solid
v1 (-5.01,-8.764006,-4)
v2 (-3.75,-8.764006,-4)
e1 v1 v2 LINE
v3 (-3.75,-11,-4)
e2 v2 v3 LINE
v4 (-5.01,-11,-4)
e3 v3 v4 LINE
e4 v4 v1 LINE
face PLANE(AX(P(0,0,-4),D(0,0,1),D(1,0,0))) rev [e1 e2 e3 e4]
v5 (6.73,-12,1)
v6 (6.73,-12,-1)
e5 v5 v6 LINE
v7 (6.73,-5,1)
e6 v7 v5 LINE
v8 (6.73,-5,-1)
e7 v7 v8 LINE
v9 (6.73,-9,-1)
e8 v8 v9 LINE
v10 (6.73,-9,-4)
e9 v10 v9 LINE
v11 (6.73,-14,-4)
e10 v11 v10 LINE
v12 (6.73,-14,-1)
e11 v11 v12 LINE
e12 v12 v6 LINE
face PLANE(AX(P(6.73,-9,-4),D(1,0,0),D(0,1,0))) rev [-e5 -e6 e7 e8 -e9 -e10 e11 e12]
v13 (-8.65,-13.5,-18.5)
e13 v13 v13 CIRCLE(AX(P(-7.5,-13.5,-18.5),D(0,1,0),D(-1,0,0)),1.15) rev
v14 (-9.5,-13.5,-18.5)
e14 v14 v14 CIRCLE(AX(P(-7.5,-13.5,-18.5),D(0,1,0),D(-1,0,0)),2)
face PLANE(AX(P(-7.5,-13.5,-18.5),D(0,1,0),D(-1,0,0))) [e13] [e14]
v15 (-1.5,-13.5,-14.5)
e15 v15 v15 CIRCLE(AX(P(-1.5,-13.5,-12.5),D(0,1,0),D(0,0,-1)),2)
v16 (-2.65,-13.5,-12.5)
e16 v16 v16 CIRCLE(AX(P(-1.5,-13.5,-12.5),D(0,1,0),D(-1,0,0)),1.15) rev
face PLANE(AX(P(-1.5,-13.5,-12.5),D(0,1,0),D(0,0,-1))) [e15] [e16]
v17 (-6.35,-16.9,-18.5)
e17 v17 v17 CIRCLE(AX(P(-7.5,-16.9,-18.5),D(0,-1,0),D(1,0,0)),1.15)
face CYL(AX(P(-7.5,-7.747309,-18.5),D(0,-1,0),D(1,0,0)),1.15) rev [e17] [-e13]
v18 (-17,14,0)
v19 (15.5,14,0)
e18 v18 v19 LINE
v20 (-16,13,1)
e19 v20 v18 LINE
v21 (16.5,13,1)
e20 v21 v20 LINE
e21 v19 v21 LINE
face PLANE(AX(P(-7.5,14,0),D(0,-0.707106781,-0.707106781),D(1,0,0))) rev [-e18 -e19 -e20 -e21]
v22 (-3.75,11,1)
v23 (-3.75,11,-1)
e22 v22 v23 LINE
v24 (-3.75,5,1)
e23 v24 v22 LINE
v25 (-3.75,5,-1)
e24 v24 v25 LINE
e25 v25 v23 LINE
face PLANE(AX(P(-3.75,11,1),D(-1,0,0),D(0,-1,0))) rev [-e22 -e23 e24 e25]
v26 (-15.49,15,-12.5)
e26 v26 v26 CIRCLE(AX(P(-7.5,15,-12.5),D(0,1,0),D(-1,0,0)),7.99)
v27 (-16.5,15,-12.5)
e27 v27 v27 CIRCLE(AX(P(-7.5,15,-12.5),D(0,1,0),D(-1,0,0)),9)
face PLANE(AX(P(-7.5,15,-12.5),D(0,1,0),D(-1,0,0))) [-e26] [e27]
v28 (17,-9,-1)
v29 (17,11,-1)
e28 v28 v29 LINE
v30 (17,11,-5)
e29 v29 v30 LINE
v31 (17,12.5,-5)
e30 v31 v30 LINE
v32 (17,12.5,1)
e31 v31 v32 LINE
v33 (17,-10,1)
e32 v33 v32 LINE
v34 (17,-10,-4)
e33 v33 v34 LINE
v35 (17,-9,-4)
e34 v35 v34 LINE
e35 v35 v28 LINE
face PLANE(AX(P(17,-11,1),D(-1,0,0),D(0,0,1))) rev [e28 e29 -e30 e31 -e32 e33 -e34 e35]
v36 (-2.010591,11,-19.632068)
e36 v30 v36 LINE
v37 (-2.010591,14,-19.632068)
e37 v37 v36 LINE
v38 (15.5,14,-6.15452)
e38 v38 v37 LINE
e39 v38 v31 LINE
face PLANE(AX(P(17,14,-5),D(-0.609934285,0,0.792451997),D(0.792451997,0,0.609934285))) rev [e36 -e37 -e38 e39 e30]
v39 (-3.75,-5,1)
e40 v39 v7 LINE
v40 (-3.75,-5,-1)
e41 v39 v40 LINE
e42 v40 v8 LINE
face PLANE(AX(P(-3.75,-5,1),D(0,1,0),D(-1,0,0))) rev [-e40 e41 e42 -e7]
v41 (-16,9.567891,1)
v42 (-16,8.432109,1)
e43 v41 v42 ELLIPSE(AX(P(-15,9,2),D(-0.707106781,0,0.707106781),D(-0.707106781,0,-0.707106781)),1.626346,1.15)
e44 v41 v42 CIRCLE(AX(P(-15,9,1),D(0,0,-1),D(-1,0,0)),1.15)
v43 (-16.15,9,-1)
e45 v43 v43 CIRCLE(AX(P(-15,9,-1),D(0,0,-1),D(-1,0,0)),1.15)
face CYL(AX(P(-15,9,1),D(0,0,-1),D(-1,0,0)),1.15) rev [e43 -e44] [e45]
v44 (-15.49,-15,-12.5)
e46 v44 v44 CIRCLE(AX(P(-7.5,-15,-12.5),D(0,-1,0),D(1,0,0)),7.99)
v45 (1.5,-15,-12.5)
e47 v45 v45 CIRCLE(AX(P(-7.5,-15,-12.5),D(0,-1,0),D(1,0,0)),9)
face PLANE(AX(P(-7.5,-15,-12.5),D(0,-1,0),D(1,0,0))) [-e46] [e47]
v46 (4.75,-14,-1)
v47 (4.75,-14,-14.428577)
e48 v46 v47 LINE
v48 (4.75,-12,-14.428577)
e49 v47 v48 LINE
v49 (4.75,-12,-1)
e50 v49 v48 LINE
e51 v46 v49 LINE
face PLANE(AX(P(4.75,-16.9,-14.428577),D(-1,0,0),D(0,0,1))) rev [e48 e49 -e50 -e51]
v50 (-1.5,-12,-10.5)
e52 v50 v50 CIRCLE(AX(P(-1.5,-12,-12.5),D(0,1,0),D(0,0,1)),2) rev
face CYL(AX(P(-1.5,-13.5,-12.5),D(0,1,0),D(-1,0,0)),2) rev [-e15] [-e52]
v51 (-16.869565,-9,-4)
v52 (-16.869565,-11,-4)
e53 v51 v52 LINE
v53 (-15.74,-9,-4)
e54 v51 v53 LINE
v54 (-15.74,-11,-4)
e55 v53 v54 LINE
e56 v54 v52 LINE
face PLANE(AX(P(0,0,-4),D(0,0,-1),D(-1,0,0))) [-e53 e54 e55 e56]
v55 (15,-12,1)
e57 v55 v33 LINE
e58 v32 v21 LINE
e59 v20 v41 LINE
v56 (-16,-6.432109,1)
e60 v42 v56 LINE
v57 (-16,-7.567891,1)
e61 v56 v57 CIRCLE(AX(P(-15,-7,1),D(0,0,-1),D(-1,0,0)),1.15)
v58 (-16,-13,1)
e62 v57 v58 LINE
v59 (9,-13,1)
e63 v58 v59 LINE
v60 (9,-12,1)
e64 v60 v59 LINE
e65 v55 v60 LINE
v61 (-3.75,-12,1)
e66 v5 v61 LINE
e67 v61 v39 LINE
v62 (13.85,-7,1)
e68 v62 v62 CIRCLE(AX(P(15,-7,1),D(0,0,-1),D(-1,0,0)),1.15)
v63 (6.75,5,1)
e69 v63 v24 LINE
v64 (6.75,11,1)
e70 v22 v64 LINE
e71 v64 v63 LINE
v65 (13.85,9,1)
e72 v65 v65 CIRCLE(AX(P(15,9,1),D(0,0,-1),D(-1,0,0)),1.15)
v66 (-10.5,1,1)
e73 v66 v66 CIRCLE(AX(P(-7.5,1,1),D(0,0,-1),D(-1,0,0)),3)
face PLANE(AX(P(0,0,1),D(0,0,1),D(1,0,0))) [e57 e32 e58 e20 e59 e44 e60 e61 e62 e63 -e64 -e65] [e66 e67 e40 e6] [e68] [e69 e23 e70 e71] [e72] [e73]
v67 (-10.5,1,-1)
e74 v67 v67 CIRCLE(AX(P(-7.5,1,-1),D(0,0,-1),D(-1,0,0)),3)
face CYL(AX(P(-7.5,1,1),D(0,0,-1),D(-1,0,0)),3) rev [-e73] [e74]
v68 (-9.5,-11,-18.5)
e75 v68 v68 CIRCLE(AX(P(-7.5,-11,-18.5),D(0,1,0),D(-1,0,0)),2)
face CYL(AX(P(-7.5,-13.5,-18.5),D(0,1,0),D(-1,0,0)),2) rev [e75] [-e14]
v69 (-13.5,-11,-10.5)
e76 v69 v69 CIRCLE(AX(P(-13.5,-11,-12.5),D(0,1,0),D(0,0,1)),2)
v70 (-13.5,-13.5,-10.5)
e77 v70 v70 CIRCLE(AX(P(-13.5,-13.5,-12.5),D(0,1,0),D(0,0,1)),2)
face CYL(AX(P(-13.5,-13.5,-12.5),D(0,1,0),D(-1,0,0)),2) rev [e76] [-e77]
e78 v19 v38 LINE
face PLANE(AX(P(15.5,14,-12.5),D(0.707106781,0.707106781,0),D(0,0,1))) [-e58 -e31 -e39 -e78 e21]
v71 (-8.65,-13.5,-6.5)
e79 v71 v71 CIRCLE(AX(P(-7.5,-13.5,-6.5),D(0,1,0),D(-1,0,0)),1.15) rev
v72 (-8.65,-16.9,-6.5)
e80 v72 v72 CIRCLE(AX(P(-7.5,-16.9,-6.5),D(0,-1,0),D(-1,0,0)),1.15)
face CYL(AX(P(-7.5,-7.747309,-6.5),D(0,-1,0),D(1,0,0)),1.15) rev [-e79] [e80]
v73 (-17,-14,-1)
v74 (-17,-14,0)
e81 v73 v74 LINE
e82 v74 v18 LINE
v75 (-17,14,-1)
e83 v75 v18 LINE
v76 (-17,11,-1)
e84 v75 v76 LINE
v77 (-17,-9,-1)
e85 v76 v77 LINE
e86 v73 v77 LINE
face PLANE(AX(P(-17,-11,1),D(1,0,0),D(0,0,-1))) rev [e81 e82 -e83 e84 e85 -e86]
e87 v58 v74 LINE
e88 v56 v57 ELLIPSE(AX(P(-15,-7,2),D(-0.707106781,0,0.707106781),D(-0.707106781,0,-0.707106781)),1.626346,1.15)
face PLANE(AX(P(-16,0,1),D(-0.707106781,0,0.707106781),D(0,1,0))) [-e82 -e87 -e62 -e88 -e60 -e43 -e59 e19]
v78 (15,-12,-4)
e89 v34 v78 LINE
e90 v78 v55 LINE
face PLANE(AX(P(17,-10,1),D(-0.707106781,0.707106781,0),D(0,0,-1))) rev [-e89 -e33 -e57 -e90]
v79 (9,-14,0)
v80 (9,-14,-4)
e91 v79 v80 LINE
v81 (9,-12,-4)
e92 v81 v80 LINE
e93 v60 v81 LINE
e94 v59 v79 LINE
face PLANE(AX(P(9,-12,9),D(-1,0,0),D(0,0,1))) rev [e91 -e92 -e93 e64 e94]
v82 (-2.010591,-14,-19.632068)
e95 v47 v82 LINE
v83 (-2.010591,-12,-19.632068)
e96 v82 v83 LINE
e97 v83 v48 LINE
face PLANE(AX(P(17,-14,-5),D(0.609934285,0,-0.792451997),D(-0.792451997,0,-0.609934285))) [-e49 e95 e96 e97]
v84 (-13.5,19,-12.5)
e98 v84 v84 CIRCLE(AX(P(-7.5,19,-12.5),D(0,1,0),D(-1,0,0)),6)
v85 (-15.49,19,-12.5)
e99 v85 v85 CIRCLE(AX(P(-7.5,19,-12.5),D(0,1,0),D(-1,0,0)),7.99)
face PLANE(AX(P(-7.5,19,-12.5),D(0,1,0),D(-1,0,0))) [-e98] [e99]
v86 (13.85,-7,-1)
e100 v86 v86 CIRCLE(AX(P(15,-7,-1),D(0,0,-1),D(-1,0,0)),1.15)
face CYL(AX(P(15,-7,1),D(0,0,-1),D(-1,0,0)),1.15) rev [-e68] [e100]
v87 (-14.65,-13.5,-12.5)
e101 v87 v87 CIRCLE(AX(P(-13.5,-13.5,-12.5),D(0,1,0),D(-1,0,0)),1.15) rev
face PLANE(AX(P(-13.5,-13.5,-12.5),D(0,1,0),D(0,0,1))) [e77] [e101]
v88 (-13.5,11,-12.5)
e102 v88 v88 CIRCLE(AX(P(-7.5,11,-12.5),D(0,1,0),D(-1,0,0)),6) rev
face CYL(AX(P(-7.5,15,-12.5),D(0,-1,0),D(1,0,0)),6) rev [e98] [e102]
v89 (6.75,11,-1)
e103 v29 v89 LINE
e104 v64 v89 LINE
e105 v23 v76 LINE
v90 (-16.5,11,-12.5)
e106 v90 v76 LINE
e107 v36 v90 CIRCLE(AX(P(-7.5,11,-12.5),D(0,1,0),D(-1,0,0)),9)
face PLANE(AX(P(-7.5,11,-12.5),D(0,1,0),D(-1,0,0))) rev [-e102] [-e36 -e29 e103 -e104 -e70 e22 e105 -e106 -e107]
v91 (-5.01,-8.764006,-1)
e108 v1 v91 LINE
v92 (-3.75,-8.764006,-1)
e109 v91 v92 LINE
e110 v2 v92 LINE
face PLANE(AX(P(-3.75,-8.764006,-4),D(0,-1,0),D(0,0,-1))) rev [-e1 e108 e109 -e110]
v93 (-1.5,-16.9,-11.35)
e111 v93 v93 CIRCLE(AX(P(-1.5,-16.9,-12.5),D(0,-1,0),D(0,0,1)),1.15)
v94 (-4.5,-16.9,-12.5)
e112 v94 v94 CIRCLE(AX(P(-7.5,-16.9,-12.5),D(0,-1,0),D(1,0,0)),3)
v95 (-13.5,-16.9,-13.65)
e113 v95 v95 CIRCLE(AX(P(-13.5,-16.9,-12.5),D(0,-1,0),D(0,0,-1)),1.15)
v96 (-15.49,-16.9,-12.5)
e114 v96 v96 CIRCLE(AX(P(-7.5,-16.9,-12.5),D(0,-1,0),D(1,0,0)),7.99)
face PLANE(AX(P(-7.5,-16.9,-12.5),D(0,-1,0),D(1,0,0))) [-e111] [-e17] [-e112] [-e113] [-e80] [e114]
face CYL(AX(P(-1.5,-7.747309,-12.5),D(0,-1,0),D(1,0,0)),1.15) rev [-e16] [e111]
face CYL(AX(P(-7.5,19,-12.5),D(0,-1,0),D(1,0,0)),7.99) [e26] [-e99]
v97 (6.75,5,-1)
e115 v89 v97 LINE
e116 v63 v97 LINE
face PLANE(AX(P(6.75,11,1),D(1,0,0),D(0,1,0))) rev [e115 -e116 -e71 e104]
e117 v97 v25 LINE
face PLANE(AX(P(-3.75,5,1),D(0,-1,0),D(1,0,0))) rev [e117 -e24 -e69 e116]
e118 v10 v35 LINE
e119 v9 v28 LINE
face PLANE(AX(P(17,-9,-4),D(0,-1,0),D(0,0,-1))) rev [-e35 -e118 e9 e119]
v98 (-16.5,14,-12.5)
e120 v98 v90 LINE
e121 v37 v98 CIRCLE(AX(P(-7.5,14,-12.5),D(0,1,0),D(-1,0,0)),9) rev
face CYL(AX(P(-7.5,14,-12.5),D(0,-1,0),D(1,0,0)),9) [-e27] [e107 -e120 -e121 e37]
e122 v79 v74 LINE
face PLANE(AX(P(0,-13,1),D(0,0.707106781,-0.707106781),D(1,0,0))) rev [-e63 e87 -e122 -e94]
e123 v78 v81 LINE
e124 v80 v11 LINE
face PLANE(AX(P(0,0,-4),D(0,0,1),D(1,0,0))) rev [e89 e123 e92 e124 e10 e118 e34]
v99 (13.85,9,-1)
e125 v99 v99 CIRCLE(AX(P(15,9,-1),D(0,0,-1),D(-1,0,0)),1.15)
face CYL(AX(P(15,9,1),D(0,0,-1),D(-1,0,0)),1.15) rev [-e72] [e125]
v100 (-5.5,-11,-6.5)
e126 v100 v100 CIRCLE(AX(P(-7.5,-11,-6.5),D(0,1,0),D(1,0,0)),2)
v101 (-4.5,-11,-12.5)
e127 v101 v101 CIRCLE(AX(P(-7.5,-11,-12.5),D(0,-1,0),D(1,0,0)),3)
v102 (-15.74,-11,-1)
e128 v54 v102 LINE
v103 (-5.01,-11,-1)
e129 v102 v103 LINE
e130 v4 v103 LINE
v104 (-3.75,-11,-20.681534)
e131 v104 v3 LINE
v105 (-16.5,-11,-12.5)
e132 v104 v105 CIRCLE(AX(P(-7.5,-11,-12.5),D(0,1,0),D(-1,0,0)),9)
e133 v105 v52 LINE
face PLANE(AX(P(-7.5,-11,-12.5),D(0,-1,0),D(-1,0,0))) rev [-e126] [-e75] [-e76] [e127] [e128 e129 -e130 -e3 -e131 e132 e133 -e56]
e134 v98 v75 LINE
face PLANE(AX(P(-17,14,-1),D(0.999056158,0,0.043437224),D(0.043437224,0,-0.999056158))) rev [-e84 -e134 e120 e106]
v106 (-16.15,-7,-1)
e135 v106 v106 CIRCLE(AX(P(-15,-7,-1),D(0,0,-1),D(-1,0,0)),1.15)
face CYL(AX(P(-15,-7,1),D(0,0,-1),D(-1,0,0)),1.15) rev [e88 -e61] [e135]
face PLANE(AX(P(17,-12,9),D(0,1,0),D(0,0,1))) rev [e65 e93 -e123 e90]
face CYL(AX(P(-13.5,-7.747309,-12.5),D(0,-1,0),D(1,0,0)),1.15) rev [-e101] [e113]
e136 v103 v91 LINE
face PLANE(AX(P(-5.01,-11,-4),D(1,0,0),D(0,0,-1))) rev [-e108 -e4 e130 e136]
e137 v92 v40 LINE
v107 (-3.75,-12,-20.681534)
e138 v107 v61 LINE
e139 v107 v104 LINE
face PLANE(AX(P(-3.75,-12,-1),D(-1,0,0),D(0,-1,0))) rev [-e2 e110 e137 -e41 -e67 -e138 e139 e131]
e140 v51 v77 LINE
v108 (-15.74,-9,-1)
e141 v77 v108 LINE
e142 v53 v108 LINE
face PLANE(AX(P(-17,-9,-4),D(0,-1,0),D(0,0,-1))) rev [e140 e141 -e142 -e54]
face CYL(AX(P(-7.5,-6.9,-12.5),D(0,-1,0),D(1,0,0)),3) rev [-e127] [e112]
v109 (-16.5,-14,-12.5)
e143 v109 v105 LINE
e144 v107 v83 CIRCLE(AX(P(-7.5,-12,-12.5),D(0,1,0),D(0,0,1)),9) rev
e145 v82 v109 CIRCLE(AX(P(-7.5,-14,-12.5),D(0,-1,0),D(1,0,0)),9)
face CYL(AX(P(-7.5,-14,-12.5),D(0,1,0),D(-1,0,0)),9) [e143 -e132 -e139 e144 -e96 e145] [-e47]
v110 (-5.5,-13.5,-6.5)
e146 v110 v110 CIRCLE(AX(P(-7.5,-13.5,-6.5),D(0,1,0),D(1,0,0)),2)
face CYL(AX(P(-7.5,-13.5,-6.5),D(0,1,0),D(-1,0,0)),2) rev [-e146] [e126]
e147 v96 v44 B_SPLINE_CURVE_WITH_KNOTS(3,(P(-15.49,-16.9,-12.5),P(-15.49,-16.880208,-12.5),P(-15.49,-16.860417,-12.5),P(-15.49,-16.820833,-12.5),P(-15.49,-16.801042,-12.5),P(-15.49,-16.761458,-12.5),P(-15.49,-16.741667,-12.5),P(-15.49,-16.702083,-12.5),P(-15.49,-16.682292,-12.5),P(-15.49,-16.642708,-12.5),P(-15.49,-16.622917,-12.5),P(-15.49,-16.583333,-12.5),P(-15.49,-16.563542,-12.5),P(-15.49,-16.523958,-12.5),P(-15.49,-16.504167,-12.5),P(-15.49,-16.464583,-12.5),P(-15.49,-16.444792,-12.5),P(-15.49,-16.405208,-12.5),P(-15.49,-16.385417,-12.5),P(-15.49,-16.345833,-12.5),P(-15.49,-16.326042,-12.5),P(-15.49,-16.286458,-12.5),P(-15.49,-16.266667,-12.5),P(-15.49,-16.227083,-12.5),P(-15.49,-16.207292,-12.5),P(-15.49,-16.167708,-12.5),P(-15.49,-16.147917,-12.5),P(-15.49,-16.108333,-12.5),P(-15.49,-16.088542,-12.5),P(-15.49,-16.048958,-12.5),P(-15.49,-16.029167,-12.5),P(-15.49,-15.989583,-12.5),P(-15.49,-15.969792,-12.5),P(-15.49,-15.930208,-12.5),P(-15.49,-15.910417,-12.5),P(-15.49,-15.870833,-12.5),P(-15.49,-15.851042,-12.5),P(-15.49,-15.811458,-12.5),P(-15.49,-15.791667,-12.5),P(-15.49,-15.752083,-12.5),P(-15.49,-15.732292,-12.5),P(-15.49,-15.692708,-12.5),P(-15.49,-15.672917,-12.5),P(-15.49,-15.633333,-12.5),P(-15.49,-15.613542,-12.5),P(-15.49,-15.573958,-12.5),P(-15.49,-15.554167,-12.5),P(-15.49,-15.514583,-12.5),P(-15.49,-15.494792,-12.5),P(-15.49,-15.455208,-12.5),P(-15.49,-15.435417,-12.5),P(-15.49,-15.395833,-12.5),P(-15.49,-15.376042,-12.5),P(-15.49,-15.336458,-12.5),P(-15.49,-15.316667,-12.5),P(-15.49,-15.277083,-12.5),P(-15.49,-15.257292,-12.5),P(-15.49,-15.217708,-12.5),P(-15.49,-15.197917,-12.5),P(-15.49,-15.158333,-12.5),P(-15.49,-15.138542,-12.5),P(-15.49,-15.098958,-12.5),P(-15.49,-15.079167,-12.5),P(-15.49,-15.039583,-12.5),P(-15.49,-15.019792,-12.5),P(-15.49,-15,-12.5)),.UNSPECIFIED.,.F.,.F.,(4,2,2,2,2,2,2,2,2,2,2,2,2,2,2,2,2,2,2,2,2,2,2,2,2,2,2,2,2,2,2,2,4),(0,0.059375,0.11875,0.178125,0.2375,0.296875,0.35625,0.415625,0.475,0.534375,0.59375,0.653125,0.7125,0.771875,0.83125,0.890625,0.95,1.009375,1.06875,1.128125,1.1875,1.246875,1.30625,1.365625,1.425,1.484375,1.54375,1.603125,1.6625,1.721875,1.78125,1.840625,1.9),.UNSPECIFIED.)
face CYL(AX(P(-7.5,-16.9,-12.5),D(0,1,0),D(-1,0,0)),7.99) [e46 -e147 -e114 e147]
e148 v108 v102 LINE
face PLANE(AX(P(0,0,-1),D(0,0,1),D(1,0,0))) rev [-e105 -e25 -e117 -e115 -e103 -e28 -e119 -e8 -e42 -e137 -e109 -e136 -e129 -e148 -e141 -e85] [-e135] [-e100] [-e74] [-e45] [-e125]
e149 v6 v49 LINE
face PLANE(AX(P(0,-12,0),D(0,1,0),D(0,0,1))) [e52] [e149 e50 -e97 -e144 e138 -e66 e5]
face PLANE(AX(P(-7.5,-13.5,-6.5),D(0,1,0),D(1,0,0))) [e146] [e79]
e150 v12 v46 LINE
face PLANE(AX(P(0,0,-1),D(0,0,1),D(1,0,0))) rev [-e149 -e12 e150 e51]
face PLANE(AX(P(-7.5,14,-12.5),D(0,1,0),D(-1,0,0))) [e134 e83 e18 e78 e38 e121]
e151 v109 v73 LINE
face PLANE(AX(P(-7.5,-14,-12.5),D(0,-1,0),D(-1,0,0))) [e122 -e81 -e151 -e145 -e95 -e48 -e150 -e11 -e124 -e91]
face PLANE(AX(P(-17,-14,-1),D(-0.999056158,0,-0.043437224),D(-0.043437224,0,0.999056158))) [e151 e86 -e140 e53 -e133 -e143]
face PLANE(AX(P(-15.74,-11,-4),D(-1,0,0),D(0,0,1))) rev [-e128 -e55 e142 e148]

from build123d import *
from build123d.topology import SkipClean

# Parameters (mm, degrees)
SKETCH_1_W               = 34
SKETCH_1_H               = 22
EXTRUDE_1_DEPTH          = 1
SKETCH_3_R               = 9
SKETCH_3_R_2             = 6
EXTRUDE_3_DEPTH          = 4
SKETCH_4_R               = 7.99
SKETCH_4_R_2             = 6
EXTRUDE_4_DEPTH          = 4
EXTRUDE_5_DEPTH          = 3
CUT_EXTRUDE_START        = -3
SKETCH_6_R               = 6
CUT_EXTRUDE_1_DEPTH      = 3
MIRROR_START             = -14
MIRROR_9_OUTLINE_R       = 6
MIRROR_9_DEPTH           = 3
EXTRUDE_START            = 1
SKETCH_7_R               = 9
SKETCH_7_R_2             = 6
EXTRUDE_6_DEPTH          = 1
EXTRUDE_START_2          = 1.9
SKETCH_8_R               = 7.99
EXTRUDE_7_DEPTH          = 1.9
EXTRUDE_START_3          = -5.9
SKETCH_9_R               = 6
EXTRUDE_8_DEPTH          = 5.9
SKETCH_10_R              = 3
CUT_EXTRUDE_2_DEPTH      = 10
CUT_EXTRUDE_3_REACH      = 47.167
SKETCH_11_R              = 1.15
PATTERN_CIRCULAR_1_COUNT = 4
SKETCH_12_R              = 2
CUT_EXTRUDE_4_DEPTH      = 2.5
PATTERN_CIRCULAR_2_COUNT = 4
CUT_EXTRUDE_5_DEPTH      = 41.635575547
CHAMFER_1_SIZE           = 1.5
SKETCH_15_W              = 8
SKETCH_15_H              = 2
CUT_EXTRUDE_8_DEPTH      = 10
EXTRUDE_9_DEPTH          = 3
SKETCH_17_W              = 8.5
SKETCH_17_H              = 21.138622828
CUT_EXTRUDE_9_DEPTH      = 1
SKETCH_18_W              = 10.48
SKETCH_18_H              = 7
SKETCH_18_W_2            = 10.5
SKETCH_18_H_2            = 6
CUT_EXTRUDE_10_DEPTH     = 33.714675606
CHAMFER_2_SIZE           = 2
SKETCH_19_R              = 3
CUT_EXTRUDE_11_DEPTH     = 33.714675606
SKETCH_20_R              = 1.15
CUT_EXTRUDE_12_DEPTH     = 33.714675606
SKETCH_23_W              = 1.26
SKETCH_23_H              = 2
SKETCH_23_H_2            = 2.235993873
EXTRUDE_10_DEPTH         = 3
CUT_EXTRUDE_14_DEPTH     = 43.898135158
CHAMFER_3_SIZE           = 1


# Read off the part's stored shape, not the designer's step: 镜向9
with BuildPart() as part:
    # 草图1 → 凸台-拉伸1 (new, symmetric)
    with BuildSketch(Plane.XY):
        Rectangle(SKETCH_1_W, SKETCH_1_H)
    extrude(amount=EXTRUDE_1_DEPTH, both=True)



with BuildPart() as body_2:
    # 草图3 → 凸台-拉伸3 (new body)
    with BuildSketch(Plane(origin=(0, 11, 0), x_dir=(1, 0, 0), z_dir=(0, 1, 0))):
        with Locations(Location((-7.5, 12.5, 0), (0, 0, 180))):
            Circle(SKETCH_3_R)
        with Locations(Location((-7.5, 12.5, 0), (0, 0, 180))):
            Circle(SKETCH_3_R_2, mode=Mode.SUBTRACT)
    extrude(amount=EXTRUDE_3_DEPTH)

    # 草图4 → 凸台-拉伸4 (add)
    with BuildSketch(Plane(origin=(0, 15, 0), x_dir=(1, 0, 0), z_dir=(0, 1, 0))):
        with Locations(Location((-7.5, 12.5, 0), (0, 0, 180))):
            Circle(SKETCH_4_R)
        with Locations(Location((-7.5, 12.5, 0), (0, 0, 180))):
            Circle(SKETCH_4_R_2, mode=Mode.SUBTRACT)
    extrude(amount=EXTRUDE_4_DEPTH)


with BuildPart() as part_1:
    add(part.part)

    add(body_2.part)  # 凸台-拉伸5 merges body 2
    # 草图5 → 凸台-拉伸5 (add)
    with BuildSketch(Plane(origin=(0, 11, 0), x_dir=(1, 0, 0), z_dir=(0, 1, 0))):
        with BuildLine():
            Line((17, -1), (17, 5))
            Line((17, 5), (-2.010591436, 19.632067976))
            ThreePointArc((-2.010591436, 19.632067976), (-11.47462721, 20.574796501), (-16.5, 12.5))
            Line((-16.5, 12.5), (-17, 1))
            Line((-17, 1), (-17, -1))
            Line((-17, -1), (17, -1))
        make_face()
    extrude(amount=EXTRUDE_5_DEPTH)

    # 草图6 → 切除-拉伸1 (cut)
    with BuildSketch(Plane(origin=(0, 14, 0), x_dir=(1, 0, 0), z_dir=(0, 1, 0)).offset(CUT_EXTRUDE_START)):
        with Locations(Location((-7.5, 12.5, 0), (0, 0, 180))):
            Circle(SKETCH_6_R)
    extrude(amount=CUT_EXTRUDE_1_DEPTH, mode=Mode.SUBTRACT)

    # 镜向9 outline → 镜向9 (add)
    with BuildSketch(Plane(origin=(0, 0, 0), x_dir=(1, 0, 0), z_dir=(0, 1, 0)).offset(MIRROR_START)):
        with BuildLine():
            Line((-17, 1), (-17, -1))
            Line((-17, -1), (17, -1))
            Line((17, -1), (17, 5))
            Line((17, 5), (-2.010591436, 19.632067976))
            ThreePointArc((-2.010591436, 19.632067976), (-11.47462721, 20.574796501), (-16.5, 12.5))
            Line((-16.5, 12.5), (-17, 1))
        make_face()
        with Locations((-7.5, 12.5)):
            Circle(MIRROR_9_OUTLINE_R, mode=Mode.SUBTRACT)
    extrude(amount=MIRROR_9_DEPTH)

    # 草图7 → 凸台-拉伸6 (add)
    with SkipClean():  # the faces are left unmerged after this step: merging them gives an invalid solid
        with BuildSketch(Plane.XZ.offset(14).offset(EXTRUDE_START)):
            with Locations(Location((-7.5, -12.5, 0), (0, 0, 180))):
                Circle(SKETCH_7_R)
            with Locations(Location((-7.5, -12.5, 0), (0, 0, 180))):
                Circle(SKETCH_7_R_2, mode=Mode.SUBTRACT)
        extrude(amount=-EXTRUDE_6_DEPTH)

    # 草图8 → 凸台-拉伸7 (add)
    with SkipClean():  # the faces are left unmerged after this step: merging them gives an invalid solid
        with BuildSketch(Plane.XZ.offset(15).offset(EXTRUDE_START_2)):
            with Locations(Location((-7.5, -12.5, 0), (0, 0, 180))):
                Circle(SKETCH_8_R)
        extrude(amount=-EXTRUDE_7_DEPTH)

    # 草图9 → 凸台-拉伸8 (add)
    with BuildSketch(Plane(origin=(0, -11, 0), x_dir=(1, 0, 0), z_dir=(0, 1, 0)).offset(EXTRUDE_START_3)):
        with Locations(Location((-7.5, 12.5, 0), (0, 0, 180))):
            Circle(SKETCH_9_R)
    extrude(amount=EXTRUDE_8_DEPTH)

    # 草图10 → 切除-拉伸2 (cut)
    with BuildSketch(Plane.XZ.offset(16.9)):
        with Locations((-7.5, -12.5)):
            Circle(SKETCH_10_R)
    extrude(amount=-CUT_EXTRUDE_2_DEPTH, mode=Mode.SUBTRACT)

    # 草图11 → 切除-拉伸3 (cut, up to next)
    with BuildSketch(Plane.XZ.offset(16.9), mode=Mode.PRIVATE) as cut_extrude_3_sk1:
        with Locations((-7.5, -18.5)):
            Circle(SKETCH_11_R)
    cut_extrude_3_tool1 = extrude(cut_extrude_3_sk1.sketch, amount=-CUT_EXTRUDE_3_REACH, mode=Mode.PRIVATE) & part_1.part
    cut_extrude_3 = cut_extrude_3_tool1.solids().sort_by_distance((-7.5, -16.9, -18.5))[0]
    add(cut_extrude_3, mode=Mode.SUBTRACT)

    # 阵列(圆周)1: 切除-拉伸3 ×4 about axis
    pattern_circular_1_axis = Axis((-7.5, 0, -12.5), (0, 1, 0))
    for i in range(1, PATTERN_CIRCULAR_1_COUNT):
        add(cut_extrude_3.rotate(pattern_circular_1_axis, i * 360 / PATTERN_CIRCULAR_1_COUNT), mode=Mode.SUBTRACT)

    # 草图12 → 切除-拉伸4 (cut)
    with BuildSketch(Plane(origin=(0, -11, 0), x_dir=(1, 0, 0), z_dir=(0, 1, 0))):
        with Locations(Location((-7.5, 18.5, 0), (0, 0, 180))):
            Circle(SKETCH_12_R)
    cut_extrude_4 = extrude(amount=-CUT_EXTRUDE_4_DEPTH, mode=Mode.SUBTRACT)

    # 阵列(圆周)2: 切除-拉伸4 ×4 about axis
    pattern_circular_2_axis = Axis((-7.5, 0, -12.5), (0, 1, 0))
    for i in range(1, PATTERN_CIRCULAR_2_COUNT):
        add(cut_extrude_4.rotate(pattern_circular_2_axis, i * 360 / PATTERN_CIRCULAR_2_COUNT), mode=Mode.SUBTRACT)

    # 草图14 → 切除-拉伸5 (cut, through all)
    with BuildSketch(Plane(origin=(0, -11, 0), x_dir=(1, 0, 0), z_dir=(0, 1, 0))):
        Polygon((17, 5), (4.75, 14.428577397), (4.75, 1), (17, 1), align=None)
    extrude(amount=-CUT_EXTRUDE_5_DEPTH, mode=Mode.SUBTRACT)

    # 倒角1
    chamfer_1_edges = [part_1.edges().sort_by_distance(p)[0] for p in [
        (17, 14, -2),
    ]]
    chamfer(chamfer_1_edges, length=CHAMFER_1_SIZE)

    # 草图15 → 切除-拉伸8 (cut)
    with BuildSketch(Plane(origin=(0, 0, -1), x_dir=(-1, 0, 0), z_dir=(0, 0, -1))):
        with Locations((-13, -13)):
            Rectangle(SKETCH_15_W, SKETCH_15_H)
    extrude(amount=-CUT_EXTRUDE_8_DEPTH, mode=Mode.SUBTRACT)

    # 草图16 → 凸台-拉伸9 (add)
    with BuildSketch(Plane(origin=(0, 0, -1), x_dir=(-1, 0, 0), z_dir=(0, 0, -1))):
        Polygon((-17, -9), (-6.73, -9), (-6.73, -14), (-9, -14), (-9, -12), (-17, -12), align=None)
    extrude(amount=EXTRUDE_9_DEPTH)

    # 草图17 → 切除-拉伸9 (cut)
    with BuildSketch(Plane(origin=(0, -11, 0), x_dir=(1, 0, 0), z_dir=(0, 1, 0))):
        with Locations((0.5, 11.569311414)):
            Rectangle(SKETCH_17_W, SKETCH_17_H)
    extrude(amount=-CUT_EXTRUDE_9_DEPTH, mode=Mode.SUBTRACT)

    # 草图18 → 切除-拉伸10 (cut, through all)
    with BuildSketch(Plane(origin=(0, 0, -1), x_dir=(-1, 0, 0), z_dir=(0, 0, -1))):
        with Locations((-1.49, -8.5)):
            Rectangle(SKETCH_18_W, SKETCH_18_H)
        with Locations((-1.5, 8)):
            Rectangle(SKETCH_18_W_2, SKETCH_18_H_2)
    extrude(amount=-CUT_EXTRUDE_10_DEPTH, mode=Mode.SUBTRACT)

    # 倒角2
    chamfer_2_edges = [part_1.edges().sort_by_distance(p)[0] for p in [
        (17, -12, -1.5),
    ]]
    chamfer(chamfer_2_edges, length=CHAMFER_2_SIZE)

    # 草图19 → 切除-拉伸11 (cut, through all)
    with BuildSketch(Plane(origin=(0, 0, -1), x_dir=(-1, 0, 0), z_dir=(0, 0, -1))):
        with Locations((7.5, 1)):
            Circle(SKETCH_19_R)
    extrude(amount=-CUT_EXTRUDE_11_DEPTH, mode=Mode.SUBTRACT)

    # 草图20 → 切除-拉伸12 (cut, through all)
    with BuildSketch(Plane(origin=(0, 0, -1), x_dir=(-1, 0, 0), z_dir=(0, 0, -1))):
        with Locations((15, 9)):
            Circle(SKETCH_20_R)
        with Locations((-15, 9)):
            Circle(SKETCH_20_R)
        with Locations((-15, -7)):
            Circle(SKETCH_20_R)
        with Locations((15, -7)):
            Circle(SKETCH_20_R)
    extrude(amount=-CUT_EXTRUDE_12_DEPTH, mode=Mode.SUBTRACT)

    # 草图23 → 凸台-拉伸10 (add)
    with BuildSketch(Plane(origin=(0, 0, -1), x_dir=(-1, 0, 0), z_dir=(0, 0, -1))):
        with Locations((16.37, -10)):
            Rectangle(SKETCH_23_W, SKETCH_23_H)
        with Locations((4.38, -9.882003064)):
            Rectangle(SKETCH_23_W, SKETCH_23_H_2)
    extrude(amount=EXTRUDE_10_DEPTH)

    # 草图24 → 切除-拉伸14 (cut, through all)
    with BuildSketch(Plane.XZ.offset(14)):
        Polygon((-17, -1), (-16.869565217, -4), (-17, -4), align=None)
    extrude(amount=-CUT_EXTRUDE_14_DEPTH, mode=Mode.SUBTRACT)

    # 倒角3
    # the kernel refuses this chamfer: 1 mm, written as the material it takes off along each edge
    with BuildSketch(Plane(origin=(-19.571682988, 14, 1), x_dir=(0, -0.9996219169112968, 0.027495876610586296), z_dir=(1, 0, 0))) as chamfer_3_piece_1:
        Polygon((CHAMFER_3_SIZE * 0.999621916911, CHAMFER_3_SIZE * 0.0274958766106), (-CHAMFER_3_SIZE * 0.0274958766106, CHAMFER_3_SIZE * 0.999621916911), (0, 0), align=None)
    extrude(amount=37.643365976, mode=Mode.SUBTRACT)
    with BuildSketch(Plane(origin=(-19.571682988, -14, 1), x_dir=(0, 0.9996219169112968, 0.027495876610586296), z_dir=(1, 0, 0))) as chamfer_3_piece_2:
        Polygon((CHAMFER_3_SIZE * 0.999621916911, -CHAMFER_3_SIZE * 0.0274958766106), (-CHAMFER_3_SIZE * 0.0274958766106, -CHAMFER_3_SIZE * 0.999621916911), (0, 0), align=None)
    extrude(amount=31.143365976, mode=Mode.SUBTRACT)
    with BuildSketch(Plane(origin=(-17, -16.571682988, 1), x_dir=(0.9996219169112968, 0, 0.027495876610586296), z_dir=(0, 1, 0))) as chamfer_3_piece_3:
        Polygon((CHAMFER_3_SIZE * 0.999621916911, CHAMFER_3_SIZE * 0.0274958766106), (-CHAMFER_3_SIZE * 0.0274958766106, CHAMFER_3_SIZE * 0.999621916911), (0, 0), align=None)
    extrude(amount=33.143365976, mode=Mode.SUBTRACT)


solid = part_1.part
